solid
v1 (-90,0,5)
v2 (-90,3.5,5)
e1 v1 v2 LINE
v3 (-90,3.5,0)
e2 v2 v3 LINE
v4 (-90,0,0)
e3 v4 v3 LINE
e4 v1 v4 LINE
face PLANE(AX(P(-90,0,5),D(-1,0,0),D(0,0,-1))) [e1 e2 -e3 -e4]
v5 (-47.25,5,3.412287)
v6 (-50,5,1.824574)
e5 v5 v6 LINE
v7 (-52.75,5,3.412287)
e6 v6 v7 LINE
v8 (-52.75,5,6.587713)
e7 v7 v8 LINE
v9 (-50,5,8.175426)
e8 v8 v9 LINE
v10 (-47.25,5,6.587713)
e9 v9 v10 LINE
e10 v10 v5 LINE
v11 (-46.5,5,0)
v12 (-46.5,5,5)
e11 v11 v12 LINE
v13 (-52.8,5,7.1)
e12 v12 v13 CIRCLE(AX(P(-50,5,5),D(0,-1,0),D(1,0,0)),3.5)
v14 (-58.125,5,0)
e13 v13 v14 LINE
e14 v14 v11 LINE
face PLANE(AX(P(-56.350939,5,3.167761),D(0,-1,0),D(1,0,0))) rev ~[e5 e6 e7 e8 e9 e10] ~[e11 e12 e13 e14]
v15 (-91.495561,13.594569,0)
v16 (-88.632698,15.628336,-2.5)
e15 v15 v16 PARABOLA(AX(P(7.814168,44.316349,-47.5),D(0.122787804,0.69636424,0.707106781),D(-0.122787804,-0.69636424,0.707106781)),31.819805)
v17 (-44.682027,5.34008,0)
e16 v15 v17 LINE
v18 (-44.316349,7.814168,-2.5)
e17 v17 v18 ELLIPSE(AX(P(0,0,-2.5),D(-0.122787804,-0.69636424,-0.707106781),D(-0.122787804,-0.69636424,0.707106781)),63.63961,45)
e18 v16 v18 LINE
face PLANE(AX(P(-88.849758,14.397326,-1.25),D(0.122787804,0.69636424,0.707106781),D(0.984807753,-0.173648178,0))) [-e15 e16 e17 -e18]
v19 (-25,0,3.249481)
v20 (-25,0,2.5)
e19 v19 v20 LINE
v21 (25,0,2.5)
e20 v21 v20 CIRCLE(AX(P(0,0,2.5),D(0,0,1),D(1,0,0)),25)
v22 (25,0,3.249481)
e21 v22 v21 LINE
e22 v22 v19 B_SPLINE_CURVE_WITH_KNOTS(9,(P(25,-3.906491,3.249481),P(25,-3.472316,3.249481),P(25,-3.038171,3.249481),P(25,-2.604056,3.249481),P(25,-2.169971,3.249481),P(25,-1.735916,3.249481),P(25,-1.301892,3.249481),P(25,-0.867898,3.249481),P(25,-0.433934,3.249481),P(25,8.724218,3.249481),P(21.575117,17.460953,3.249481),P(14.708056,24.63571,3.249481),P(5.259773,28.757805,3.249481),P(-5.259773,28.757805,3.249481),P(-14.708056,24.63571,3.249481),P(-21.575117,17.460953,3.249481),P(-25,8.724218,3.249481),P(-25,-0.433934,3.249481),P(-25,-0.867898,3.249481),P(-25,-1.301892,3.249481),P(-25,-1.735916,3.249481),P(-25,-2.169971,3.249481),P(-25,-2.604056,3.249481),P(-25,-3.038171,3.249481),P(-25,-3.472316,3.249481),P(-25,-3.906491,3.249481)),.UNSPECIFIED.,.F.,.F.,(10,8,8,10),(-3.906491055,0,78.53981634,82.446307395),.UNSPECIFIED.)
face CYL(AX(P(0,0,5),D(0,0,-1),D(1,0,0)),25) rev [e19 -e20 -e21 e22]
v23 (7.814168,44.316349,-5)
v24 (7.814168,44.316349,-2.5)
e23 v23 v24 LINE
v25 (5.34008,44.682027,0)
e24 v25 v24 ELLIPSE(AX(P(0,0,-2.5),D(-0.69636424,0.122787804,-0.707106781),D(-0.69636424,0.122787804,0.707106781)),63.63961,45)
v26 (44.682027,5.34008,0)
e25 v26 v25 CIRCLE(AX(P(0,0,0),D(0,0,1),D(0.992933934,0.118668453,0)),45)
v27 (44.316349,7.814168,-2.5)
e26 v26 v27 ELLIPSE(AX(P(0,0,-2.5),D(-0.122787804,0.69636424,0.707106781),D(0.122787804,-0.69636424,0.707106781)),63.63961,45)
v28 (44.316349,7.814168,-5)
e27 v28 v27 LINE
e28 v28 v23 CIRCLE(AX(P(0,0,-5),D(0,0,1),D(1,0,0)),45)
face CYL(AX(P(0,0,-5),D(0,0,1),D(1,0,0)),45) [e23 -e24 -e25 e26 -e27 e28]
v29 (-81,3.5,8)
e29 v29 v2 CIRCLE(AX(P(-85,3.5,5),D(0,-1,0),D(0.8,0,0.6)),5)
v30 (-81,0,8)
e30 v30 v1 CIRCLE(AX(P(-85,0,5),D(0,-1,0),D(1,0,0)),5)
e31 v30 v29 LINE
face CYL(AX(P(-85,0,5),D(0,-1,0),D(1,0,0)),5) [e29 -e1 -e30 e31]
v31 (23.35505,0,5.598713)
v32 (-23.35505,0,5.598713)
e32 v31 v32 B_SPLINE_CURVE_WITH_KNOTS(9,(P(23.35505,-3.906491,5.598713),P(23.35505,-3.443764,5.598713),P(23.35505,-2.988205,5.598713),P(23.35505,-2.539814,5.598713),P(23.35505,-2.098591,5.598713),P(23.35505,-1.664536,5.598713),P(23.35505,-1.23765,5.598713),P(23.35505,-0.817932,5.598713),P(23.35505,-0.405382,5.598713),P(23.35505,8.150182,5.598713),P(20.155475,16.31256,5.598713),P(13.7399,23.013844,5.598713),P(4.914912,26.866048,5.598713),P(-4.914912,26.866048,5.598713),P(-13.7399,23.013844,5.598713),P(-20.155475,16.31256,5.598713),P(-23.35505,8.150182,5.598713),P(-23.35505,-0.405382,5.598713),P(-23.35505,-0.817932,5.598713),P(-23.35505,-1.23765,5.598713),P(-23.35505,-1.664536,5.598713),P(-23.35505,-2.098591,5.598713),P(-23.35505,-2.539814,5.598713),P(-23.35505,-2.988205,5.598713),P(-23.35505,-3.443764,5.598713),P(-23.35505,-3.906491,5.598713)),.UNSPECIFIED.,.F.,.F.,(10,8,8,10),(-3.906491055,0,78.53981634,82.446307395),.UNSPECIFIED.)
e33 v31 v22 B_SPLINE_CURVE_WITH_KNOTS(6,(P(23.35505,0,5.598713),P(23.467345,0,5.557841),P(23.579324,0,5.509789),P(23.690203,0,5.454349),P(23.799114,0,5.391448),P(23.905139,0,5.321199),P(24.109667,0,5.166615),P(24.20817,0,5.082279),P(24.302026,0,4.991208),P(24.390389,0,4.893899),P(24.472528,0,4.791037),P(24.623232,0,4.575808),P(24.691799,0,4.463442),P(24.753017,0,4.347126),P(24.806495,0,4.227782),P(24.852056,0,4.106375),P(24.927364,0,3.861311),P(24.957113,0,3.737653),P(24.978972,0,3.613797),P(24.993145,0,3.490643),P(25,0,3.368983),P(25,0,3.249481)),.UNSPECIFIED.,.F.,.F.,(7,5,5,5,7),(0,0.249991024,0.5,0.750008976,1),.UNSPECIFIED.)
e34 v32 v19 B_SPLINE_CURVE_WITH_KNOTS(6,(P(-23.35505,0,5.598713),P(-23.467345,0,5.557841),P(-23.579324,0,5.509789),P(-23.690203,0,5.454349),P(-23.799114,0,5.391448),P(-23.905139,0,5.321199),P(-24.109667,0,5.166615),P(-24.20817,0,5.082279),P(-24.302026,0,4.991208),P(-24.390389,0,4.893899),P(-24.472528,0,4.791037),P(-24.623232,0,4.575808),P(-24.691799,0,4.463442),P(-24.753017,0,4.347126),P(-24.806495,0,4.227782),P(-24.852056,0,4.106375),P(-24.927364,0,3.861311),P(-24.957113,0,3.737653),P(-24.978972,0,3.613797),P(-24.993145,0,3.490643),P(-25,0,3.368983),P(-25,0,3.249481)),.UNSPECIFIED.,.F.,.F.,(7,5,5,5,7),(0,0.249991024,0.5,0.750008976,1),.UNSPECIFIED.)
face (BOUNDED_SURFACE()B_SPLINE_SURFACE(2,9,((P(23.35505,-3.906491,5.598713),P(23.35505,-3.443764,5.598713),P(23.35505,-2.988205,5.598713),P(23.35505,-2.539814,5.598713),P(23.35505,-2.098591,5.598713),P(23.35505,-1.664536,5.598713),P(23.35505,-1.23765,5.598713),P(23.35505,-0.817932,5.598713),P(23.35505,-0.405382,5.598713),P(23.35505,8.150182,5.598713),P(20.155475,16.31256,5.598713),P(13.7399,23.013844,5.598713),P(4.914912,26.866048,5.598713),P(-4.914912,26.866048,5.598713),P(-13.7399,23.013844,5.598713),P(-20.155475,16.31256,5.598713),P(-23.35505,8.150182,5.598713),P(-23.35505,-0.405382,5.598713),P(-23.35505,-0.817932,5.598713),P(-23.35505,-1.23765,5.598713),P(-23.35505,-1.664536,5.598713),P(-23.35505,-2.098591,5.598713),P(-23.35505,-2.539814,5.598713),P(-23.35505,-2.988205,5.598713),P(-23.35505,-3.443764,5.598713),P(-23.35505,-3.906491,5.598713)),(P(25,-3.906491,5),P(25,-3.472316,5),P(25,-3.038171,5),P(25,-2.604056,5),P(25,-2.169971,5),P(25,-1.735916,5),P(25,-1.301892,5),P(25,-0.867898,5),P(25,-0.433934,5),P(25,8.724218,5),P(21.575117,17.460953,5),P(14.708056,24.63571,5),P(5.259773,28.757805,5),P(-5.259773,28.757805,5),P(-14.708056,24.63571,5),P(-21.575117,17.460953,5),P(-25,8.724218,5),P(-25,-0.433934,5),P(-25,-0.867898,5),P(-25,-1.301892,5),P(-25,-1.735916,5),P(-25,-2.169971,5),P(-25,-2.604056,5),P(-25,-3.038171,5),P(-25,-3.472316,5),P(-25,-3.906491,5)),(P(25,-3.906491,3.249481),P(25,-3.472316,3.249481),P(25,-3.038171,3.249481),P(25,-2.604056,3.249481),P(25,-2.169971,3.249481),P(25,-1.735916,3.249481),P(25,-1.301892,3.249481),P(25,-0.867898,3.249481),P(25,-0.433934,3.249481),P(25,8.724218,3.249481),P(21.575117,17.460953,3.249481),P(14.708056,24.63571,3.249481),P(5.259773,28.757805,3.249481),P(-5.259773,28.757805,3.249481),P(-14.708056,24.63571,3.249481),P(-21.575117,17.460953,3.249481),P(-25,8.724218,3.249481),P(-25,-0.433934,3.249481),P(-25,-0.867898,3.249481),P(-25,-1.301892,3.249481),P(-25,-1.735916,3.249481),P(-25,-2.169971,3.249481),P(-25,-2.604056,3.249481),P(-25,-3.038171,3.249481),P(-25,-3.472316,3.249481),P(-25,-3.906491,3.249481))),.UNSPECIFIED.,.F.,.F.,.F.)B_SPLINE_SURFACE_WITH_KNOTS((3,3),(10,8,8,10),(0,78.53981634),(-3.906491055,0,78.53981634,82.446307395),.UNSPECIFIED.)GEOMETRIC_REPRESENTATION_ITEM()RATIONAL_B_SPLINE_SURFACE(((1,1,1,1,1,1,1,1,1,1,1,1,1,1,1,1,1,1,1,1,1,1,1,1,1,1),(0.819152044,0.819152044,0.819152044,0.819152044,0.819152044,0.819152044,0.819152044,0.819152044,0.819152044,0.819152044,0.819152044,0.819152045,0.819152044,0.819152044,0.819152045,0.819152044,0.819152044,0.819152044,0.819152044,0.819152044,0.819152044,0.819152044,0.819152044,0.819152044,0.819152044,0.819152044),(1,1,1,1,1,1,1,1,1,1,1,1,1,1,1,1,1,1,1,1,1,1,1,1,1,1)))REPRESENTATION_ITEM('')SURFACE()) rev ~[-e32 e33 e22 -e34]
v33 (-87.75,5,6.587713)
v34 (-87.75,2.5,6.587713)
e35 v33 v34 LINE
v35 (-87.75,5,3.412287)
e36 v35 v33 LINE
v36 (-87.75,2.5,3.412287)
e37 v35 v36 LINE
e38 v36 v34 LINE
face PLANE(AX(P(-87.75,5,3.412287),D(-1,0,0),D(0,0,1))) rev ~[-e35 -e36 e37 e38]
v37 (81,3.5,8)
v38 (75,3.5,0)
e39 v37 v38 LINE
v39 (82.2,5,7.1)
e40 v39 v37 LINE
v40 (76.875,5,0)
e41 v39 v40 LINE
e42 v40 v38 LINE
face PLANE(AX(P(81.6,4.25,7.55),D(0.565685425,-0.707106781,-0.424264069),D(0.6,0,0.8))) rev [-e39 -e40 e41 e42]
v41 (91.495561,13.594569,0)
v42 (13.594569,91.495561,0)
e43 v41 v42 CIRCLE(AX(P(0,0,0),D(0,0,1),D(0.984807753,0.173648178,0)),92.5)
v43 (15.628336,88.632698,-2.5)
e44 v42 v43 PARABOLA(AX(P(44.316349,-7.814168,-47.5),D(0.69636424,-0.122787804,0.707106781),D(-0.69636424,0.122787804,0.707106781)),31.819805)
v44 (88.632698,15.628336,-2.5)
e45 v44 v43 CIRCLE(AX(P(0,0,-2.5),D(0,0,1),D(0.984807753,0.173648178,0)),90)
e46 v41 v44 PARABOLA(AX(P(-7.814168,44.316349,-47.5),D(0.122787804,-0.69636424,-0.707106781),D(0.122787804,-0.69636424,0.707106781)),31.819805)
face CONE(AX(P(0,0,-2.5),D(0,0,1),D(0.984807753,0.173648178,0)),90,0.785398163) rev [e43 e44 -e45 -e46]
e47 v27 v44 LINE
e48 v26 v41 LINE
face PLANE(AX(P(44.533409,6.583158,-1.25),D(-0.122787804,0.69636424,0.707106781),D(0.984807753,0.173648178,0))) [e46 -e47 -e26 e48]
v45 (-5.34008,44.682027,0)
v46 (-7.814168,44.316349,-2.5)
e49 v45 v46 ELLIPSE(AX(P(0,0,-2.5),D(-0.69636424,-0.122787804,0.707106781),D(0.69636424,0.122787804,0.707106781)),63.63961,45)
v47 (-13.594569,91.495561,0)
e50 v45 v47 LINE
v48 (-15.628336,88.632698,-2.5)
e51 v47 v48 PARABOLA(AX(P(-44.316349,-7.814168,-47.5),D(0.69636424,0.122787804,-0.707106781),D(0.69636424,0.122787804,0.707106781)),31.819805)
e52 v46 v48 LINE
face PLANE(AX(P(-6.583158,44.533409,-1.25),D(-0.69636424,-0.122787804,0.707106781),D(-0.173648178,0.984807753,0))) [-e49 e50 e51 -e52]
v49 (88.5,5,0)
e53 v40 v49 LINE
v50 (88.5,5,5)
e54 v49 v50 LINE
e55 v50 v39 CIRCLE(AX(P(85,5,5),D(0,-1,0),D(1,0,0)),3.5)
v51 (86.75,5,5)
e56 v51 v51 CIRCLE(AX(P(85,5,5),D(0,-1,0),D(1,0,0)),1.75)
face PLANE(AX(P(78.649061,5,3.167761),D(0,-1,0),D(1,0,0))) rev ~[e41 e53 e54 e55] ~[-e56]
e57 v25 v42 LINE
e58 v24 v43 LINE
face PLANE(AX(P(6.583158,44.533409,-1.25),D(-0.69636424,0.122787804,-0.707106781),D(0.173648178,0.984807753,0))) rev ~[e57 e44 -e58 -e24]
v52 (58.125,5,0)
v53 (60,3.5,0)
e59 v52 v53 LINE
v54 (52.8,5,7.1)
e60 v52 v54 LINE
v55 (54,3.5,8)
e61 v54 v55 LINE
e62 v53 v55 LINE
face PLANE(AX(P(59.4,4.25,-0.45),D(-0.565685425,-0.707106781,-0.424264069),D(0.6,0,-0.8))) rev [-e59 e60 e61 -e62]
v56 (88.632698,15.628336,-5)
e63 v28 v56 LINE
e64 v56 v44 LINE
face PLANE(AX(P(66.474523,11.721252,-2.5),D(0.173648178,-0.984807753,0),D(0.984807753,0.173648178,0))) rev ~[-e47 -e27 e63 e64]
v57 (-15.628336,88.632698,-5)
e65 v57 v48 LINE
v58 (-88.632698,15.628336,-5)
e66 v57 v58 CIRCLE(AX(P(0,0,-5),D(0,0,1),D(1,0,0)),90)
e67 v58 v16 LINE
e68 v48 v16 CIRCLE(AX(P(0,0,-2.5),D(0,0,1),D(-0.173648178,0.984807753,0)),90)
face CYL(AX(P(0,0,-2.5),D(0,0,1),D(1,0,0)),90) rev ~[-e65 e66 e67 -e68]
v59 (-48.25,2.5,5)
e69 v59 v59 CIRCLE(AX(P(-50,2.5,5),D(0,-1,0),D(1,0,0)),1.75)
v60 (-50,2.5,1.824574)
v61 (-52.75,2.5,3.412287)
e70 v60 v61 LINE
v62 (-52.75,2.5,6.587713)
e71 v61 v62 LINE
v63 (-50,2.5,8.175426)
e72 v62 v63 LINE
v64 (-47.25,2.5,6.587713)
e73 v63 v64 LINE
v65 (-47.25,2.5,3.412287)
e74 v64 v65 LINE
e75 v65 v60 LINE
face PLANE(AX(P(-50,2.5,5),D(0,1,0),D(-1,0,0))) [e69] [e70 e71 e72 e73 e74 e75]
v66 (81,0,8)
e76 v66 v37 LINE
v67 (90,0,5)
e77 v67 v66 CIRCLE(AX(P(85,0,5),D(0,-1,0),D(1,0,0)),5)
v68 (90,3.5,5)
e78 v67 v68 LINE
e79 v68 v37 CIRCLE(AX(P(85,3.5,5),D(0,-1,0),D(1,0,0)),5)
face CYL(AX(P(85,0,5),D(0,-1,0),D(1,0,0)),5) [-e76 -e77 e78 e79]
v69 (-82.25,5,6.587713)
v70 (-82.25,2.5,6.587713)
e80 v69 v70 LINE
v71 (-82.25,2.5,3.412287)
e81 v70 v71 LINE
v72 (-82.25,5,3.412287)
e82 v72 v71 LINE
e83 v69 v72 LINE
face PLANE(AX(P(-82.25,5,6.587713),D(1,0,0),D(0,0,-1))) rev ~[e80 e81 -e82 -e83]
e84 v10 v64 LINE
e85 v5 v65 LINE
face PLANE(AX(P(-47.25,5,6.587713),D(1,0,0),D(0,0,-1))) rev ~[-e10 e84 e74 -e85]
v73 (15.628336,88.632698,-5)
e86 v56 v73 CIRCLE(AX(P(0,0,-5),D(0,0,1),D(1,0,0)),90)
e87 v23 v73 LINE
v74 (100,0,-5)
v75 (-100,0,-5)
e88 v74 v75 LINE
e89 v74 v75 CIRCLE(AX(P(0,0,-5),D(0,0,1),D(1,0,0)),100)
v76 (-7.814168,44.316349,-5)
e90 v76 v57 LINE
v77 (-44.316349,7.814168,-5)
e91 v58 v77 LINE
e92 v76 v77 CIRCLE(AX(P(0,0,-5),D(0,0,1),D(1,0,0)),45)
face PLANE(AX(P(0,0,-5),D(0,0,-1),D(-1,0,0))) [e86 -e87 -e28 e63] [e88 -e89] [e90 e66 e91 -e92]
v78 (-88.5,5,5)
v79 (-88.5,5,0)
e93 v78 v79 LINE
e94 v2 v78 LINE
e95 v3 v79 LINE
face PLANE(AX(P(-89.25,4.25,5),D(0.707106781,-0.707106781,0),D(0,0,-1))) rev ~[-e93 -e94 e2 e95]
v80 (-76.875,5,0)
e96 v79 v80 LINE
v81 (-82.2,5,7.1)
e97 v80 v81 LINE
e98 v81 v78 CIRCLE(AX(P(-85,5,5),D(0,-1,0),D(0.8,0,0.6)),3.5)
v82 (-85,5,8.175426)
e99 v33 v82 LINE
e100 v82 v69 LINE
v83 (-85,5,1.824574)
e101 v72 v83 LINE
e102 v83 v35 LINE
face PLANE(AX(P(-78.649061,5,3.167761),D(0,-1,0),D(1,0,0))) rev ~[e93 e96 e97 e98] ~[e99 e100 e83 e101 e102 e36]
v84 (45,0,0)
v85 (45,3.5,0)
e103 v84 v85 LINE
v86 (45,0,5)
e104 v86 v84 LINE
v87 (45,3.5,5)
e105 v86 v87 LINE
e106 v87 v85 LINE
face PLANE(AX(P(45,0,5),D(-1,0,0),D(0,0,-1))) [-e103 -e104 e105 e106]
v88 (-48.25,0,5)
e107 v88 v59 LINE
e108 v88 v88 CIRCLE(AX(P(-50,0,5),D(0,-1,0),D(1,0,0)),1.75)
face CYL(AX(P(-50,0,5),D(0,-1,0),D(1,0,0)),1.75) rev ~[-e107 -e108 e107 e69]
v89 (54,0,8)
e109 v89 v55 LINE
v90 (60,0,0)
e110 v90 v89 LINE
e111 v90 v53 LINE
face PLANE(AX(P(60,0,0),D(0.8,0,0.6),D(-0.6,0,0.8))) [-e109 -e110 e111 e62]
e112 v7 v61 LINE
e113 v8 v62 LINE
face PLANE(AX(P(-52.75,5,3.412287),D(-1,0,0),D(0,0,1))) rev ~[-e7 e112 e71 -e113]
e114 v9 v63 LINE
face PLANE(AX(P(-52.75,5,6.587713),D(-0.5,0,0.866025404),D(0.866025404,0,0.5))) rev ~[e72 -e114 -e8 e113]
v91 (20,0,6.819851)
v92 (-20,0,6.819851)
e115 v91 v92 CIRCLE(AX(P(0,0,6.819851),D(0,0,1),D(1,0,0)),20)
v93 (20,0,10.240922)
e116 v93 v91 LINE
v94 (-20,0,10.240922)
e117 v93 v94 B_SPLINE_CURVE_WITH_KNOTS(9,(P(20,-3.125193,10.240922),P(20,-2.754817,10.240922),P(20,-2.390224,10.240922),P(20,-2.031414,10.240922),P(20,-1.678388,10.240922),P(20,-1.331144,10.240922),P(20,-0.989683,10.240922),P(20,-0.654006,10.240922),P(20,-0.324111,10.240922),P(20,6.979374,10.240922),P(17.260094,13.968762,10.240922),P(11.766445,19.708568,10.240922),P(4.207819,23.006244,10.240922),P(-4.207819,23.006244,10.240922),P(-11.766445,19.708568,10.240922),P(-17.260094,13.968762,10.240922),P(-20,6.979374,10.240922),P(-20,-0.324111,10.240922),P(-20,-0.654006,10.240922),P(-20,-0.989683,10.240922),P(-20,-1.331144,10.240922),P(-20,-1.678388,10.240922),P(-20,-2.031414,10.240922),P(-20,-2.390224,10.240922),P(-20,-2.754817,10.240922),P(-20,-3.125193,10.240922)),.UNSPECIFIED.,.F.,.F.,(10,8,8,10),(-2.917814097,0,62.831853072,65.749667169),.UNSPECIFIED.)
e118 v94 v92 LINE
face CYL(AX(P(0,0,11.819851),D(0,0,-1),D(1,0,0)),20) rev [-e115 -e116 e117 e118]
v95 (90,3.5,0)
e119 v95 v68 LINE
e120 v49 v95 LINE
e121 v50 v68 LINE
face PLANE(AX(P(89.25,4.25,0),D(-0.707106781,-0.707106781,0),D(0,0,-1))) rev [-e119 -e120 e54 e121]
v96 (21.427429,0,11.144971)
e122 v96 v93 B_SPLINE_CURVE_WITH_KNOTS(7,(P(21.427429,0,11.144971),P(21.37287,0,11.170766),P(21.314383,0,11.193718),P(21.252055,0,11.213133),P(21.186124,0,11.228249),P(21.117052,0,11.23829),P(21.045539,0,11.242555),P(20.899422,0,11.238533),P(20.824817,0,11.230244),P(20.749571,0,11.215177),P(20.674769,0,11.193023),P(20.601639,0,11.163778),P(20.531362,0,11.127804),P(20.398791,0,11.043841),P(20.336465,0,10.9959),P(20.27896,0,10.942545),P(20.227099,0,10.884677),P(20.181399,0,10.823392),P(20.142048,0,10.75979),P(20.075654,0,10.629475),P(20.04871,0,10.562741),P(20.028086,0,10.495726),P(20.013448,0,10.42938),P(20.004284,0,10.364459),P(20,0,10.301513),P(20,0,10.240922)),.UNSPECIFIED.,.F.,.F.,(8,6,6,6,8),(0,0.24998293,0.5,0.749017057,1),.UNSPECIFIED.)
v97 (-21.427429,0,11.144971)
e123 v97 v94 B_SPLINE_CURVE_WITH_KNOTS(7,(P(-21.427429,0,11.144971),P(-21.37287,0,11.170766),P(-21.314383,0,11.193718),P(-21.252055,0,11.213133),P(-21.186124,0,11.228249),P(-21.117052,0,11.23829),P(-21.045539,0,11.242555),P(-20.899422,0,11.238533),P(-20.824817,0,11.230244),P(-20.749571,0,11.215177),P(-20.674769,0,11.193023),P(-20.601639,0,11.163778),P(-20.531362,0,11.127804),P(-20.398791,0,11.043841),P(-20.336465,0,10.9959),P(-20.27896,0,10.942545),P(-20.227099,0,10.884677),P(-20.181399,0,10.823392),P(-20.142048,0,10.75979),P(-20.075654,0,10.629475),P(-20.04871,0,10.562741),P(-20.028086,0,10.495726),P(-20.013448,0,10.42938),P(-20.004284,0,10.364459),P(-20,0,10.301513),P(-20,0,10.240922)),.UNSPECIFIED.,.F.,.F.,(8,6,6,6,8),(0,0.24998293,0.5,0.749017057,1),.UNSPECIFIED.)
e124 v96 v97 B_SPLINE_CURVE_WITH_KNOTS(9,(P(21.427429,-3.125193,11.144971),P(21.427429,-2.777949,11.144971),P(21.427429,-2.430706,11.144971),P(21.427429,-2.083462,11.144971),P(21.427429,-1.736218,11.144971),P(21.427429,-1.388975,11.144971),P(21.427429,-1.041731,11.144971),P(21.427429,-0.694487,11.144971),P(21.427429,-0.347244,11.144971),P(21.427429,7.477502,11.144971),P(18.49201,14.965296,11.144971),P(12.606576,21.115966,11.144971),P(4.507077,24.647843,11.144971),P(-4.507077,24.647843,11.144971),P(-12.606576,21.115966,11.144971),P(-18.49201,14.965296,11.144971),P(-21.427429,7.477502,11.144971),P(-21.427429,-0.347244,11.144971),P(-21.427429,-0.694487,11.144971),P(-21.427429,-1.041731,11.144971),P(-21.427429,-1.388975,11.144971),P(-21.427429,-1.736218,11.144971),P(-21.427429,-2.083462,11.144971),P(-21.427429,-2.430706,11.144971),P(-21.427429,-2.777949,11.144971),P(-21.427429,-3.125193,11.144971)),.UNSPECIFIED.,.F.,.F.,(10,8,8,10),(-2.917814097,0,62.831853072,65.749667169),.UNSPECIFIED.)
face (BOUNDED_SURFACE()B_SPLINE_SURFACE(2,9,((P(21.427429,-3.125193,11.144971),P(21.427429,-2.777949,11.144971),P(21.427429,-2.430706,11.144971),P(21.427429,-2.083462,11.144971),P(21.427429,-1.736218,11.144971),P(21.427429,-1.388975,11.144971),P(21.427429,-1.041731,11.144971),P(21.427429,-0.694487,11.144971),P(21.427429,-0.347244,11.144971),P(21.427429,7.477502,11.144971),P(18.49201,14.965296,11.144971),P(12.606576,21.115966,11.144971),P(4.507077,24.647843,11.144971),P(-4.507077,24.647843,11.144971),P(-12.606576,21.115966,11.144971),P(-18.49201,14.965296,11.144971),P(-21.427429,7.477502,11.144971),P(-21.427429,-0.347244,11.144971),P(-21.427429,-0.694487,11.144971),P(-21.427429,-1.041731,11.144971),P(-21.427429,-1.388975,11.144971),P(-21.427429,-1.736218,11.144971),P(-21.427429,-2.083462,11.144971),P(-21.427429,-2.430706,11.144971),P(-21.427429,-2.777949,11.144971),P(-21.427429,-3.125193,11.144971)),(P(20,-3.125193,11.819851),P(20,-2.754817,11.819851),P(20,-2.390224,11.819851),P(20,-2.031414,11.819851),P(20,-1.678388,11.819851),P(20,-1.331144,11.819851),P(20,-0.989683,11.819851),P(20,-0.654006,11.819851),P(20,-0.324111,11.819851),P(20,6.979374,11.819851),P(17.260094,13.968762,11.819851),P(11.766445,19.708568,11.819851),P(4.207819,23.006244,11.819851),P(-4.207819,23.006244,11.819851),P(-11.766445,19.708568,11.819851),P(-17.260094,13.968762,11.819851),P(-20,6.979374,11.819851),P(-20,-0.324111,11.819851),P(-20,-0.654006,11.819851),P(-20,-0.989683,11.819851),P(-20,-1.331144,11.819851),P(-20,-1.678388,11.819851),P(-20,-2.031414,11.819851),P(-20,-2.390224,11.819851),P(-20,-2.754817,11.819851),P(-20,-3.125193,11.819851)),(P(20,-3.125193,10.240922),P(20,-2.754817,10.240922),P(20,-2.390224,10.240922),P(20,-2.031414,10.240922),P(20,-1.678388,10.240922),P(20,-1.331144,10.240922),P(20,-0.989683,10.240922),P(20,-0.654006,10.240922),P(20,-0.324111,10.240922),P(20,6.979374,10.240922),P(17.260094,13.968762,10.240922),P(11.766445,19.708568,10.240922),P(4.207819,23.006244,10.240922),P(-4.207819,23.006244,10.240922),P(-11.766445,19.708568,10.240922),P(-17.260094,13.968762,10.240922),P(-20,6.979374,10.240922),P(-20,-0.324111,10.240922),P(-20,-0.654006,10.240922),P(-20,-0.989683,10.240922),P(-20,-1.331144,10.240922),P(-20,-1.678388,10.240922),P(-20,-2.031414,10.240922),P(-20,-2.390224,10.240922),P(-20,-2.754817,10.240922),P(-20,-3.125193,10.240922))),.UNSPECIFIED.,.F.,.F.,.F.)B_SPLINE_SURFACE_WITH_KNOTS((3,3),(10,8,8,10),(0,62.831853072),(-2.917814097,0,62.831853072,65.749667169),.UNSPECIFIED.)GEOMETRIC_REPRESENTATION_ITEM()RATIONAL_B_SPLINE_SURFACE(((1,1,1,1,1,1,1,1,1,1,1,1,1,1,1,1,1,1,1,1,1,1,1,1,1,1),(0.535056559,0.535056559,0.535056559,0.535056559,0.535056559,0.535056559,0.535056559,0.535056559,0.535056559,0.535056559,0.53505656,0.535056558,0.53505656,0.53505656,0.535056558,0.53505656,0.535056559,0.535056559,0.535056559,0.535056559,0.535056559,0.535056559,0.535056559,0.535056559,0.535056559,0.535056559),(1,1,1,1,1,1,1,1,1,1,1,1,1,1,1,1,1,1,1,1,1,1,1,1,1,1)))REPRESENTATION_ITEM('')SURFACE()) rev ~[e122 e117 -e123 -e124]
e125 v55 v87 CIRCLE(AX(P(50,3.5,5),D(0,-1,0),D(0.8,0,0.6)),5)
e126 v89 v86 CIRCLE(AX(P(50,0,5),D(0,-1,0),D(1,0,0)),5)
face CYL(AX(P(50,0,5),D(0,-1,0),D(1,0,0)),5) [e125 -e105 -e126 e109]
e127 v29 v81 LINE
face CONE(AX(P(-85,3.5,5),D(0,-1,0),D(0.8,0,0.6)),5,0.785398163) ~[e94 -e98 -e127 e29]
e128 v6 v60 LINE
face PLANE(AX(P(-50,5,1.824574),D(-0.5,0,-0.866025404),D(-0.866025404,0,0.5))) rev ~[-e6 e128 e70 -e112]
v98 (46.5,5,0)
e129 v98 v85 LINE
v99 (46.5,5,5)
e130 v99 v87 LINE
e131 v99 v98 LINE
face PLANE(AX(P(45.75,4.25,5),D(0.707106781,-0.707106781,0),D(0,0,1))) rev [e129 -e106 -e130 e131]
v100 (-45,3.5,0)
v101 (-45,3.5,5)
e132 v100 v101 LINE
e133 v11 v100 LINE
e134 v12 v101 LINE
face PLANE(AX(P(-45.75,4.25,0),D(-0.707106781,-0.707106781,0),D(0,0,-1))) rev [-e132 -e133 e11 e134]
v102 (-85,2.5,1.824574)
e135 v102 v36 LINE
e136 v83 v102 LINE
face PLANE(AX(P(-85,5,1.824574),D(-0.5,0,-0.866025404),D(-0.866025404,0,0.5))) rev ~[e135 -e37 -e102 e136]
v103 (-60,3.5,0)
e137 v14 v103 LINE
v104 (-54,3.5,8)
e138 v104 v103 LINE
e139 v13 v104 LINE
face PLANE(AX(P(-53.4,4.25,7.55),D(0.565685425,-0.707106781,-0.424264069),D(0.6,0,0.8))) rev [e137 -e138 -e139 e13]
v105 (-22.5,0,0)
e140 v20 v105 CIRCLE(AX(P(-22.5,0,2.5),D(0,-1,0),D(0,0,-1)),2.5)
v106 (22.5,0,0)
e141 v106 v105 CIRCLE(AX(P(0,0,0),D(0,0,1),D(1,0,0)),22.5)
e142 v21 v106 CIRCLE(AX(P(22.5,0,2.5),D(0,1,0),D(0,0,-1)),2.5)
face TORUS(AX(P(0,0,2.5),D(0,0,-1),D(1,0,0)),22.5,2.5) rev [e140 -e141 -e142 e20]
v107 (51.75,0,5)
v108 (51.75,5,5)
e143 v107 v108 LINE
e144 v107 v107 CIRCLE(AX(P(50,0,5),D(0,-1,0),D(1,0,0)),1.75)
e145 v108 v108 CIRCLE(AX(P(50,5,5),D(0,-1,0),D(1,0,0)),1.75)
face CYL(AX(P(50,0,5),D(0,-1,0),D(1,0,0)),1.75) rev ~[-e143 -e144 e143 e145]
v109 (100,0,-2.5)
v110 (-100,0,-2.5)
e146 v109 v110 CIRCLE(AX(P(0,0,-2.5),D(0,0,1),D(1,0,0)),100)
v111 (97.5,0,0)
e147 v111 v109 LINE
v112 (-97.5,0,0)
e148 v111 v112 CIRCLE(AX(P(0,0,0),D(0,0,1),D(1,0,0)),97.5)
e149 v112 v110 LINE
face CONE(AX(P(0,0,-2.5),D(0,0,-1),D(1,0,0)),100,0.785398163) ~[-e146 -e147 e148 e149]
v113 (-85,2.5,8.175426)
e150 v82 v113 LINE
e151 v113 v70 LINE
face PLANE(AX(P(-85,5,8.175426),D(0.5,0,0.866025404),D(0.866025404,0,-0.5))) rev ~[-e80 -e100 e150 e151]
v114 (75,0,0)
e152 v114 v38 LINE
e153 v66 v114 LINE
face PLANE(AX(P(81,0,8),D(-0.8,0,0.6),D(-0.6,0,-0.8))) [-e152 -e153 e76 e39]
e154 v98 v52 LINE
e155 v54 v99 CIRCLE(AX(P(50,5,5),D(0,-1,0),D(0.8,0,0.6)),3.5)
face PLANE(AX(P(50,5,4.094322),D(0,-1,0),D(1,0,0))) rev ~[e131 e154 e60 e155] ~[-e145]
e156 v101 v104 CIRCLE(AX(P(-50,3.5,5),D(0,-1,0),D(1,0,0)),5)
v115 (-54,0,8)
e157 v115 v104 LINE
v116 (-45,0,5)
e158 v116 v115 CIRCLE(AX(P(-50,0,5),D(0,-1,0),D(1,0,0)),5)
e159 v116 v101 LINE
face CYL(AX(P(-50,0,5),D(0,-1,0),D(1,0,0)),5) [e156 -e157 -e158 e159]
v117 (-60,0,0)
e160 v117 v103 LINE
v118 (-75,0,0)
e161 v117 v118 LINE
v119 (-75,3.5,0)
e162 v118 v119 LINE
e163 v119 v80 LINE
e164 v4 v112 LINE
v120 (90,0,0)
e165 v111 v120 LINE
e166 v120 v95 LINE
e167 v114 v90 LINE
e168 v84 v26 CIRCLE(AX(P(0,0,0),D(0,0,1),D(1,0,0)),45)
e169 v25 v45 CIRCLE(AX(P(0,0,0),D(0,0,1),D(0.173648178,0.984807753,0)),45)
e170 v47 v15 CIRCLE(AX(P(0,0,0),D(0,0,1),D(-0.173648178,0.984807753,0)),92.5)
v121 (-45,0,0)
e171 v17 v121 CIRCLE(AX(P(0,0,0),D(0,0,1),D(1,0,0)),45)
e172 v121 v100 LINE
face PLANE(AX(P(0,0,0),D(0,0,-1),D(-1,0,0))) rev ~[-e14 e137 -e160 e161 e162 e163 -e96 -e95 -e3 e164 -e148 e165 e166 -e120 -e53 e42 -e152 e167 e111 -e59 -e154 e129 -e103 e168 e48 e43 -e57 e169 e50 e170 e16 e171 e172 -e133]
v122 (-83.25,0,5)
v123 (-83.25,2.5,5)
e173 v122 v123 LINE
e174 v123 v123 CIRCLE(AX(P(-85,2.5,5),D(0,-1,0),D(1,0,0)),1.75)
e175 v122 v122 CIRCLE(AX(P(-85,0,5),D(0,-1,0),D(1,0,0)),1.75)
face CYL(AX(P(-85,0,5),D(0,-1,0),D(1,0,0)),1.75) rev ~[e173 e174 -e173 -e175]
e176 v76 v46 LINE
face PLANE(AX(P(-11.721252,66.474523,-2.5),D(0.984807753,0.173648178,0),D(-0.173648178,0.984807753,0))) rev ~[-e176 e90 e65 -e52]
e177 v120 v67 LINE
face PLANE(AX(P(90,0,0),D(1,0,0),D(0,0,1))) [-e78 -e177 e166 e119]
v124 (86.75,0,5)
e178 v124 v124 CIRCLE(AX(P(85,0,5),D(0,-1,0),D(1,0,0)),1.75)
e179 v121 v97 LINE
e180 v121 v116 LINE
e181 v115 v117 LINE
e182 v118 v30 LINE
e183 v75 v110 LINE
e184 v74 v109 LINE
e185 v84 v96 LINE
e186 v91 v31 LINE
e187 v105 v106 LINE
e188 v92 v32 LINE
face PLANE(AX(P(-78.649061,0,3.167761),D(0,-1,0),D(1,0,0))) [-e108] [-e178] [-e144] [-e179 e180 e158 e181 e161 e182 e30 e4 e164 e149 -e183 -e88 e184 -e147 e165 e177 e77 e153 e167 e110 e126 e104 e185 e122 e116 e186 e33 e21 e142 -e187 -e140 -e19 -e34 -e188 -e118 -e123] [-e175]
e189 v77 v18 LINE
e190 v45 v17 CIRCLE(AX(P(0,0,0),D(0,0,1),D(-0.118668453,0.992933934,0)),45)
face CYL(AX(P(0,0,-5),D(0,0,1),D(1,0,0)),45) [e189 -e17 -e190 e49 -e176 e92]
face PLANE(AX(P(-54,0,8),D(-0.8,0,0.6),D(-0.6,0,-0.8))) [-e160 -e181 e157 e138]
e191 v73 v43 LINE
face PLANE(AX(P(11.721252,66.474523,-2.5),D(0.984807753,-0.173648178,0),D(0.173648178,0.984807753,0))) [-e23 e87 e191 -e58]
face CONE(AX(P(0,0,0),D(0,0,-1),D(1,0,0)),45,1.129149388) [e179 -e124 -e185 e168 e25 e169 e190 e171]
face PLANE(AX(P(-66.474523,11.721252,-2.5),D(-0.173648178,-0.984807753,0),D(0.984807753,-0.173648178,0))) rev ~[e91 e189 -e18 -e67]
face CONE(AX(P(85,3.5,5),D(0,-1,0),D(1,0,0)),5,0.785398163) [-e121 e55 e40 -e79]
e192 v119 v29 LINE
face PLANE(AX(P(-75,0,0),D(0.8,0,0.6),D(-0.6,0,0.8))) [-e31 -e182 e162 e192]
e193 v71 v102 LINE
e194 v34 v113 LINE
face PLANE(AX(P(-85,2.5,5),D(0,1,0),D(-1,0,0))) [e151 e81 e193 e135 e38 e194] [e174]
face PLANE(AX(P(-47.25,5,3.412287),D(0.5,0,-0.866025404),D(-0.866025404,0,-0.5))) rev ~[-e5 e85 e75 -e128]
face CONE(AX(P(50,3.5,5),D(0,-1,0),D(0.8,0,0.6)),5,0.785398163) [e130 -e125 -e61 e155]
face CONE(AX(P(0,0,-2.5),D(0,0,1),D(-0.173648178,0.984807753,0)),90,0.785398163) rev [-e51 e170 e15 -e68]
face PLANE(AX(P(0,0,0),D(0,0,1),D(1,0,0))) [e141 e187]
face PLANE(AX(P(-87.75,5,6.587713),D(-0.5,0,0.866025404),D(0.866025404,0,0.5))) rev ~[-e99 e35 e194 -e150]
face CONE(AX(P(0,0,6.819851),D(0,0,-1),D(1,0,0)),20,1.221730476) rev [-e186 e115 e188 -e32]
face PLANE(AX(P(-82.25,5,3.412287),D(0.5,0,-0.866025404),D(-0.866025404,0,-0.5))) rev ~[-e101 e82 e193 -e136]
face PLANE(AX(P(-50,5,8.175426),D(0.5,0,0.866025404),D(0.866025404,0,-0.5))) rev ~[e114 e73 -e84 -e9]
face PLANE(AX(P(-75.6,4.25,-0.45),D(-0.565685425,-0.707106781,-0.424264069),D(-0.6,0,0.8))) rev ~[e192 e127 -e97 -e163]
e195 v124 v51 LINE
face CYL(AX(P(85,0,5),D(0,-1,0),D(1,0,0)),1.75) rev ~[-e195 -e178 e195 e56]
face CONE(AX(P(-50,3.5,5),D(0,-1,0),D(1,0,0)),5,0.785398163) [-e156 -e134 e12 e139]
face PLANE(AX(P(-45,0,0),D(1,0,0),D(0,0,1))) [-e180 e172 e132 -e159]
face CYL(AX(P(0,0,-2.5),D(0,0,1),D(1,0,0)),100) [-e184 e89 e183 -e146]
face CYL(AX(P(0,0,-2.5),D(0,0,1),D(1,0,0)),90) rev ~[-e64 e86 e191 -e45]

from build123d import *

# Parameters (mm, degrees)
F1_ANGLE      = 180
F0_W          = 10
F0_H          = 5
F2_R          = 1
F3_R          = 2.5
F4_W          = 45
F4_H          = 5
F5_ANGLE      = 10
F6_W          = 45
F6_H          = 5
F7_ANGLE      = 10
F8_W          = 45
F8_H          = 5
F9_ANGLE_BACK = 10
F9_ANGLE      = 20
F10_R         = 1.75
F11_DEPTH     = 5
F13_DEPTH     = 2.5
F14_SIZE      = 2.5
F16_DEPTH     = 5
F17_SIZE      = 1.5


with BuildPart() as f1:
    # F0 (on Front) → F1 (revolve)
    with BuildSketch(Plane.XZ):
        Polygon((25, 0), (0, 0), (0, -5), (45, -5), (45, 0), (20, 11.8198511713), (20, 6.8198511713), (25, 5), align=None)
    revolve(axis=Axis((0, 0, -2.5), (0, 0, 1)), revolution_arc=F1_ANGLE)

    # F2
    f2_edges = [f1.edges().sort_by_distance(p)[0] for p in [
        (0, 20, 11.819851),
    ]]
    fillet(f2_edges, radius=F2_R)

    # F3
    f3_edges = [f1.edges().sort_by_distance(p)[0] for p in [
        (0, 25, 5),
        (0, 25, 0),
    ]]
    fillet(f3_edges, radius=F3_R)



with BuildPart() as f1b:
    # F0 (on Front) → F1, piece 2 (revolve)
    with BuildSketch(Plane.XZ):
        with Locations((95, -2.5)):
            Rectangle(F0_W, F0_H)
    revolve(axis=Axis((0, 0, -2.5), (0, 0, 1)), revolution_arc=F1_ANGLE)


with BuildPart() as f1_1:
    add(f1.part)

    add(f1b.part)  # F5 merges F1b
    # F4 (on face) → F5 (revolve)
    with BuildSketch(Plane.XZ):
        with Locations((67.5, -2.5)):
            Rectangle(F4_W, F4_H)
    revolve(axis=Axis((0, 0, 10), (0, 0, 1)), revolution_arc=F5_ANGLE)

    # F6 (on face) → F7 (revolve)
    with BuildSketch(Plane.XZ):
        with Locations((-67.5, -2.5)):
            Rectangle(F6_W, F6_H)
    revolve(axis=Axis((0, 0, 10), (0, 0, -1)), revolution_arc=F7_ANGLE)

    # F8 (on Right) → F9 (revolve)
    with BuildSketch(Plane.YZ, mode=Mode.PRIVATE) as f9_sk:
        with Locations((67.5, -2.5)):
            Rectangle(F8_W, F8_H)
    revolve(f9_sk.sketch.rotate(Axis((0, 0, 10), (0, 0, 1)), -F9_ANGLE_BACK), axis=Axis((0, 0, 10), (0, 0, 1)), revolution_arc=F9_ANGLE)

    # F10 (on face) → F11 (join)
    with BuildSketch(Plane.XZ):
        with BuildLine():
            Line((-90, 5), (-90, 0))
            Line((-90, 0), (-80, 0))
            Line((-80, 0), (-80, 5))
            ThreePointArc((-80, 5), (-85, 10), (-90, 5))
        make_face()
        with Locations((-85, 5)):
            Circle(F10_R, mode=Mode.SUBTRACT)
        with BuildLine():
            Line((-55, 0), (-45, 0))
            Line((-45, 0), (-45, 5))
            ThreePointArc((-45, 5), (-50, 10), (-55, 5))
            Line((-55, 5), (-55, 0))
        make_face()
        with Locations((-50, 5)):
            Circle(F10_R, mode=Mode.SUBTRACT)
        with BuildLine():
            Line((80, 5), (80, 0))
            Line((80, 0), (90, 0))
            Line((90, 0), (90, 5))
            ThreePointArc((90, 5), (85, 10), (80, 5))
        make_face()
        with Locations((85, 5)):
            Circle(F10_R, mode=Mode.SUBTRACT)
        with BuildLine():
            Line((45, 0), (55, 0))
            Line((55, 0), (55, 5))
            ThreePointArc((55, 5), (50, 10), (45, 5))
            Line((45, 5), (45, 0))
        make_face()
        with Locations((50, 5)):
            Circle(F10_R, mode=Mode.SUBTRACT)
    extrude(amount=-F11_DEPTH)

    # F12 (on face) → F13 (cut)
    with BuildSketch(Plane(origin=(0, 5, 0), x_dir=(-1, 0, 0), z_dir=(0, 1, 0))):
        Polygon((52.75, 3.4122867597), (52.75, 6.5877132403), (50, 8.1754264805), (47.25, 6.5877132403), (47.25, 3.4122867597), (50, 1.8245735195), align=None)
        Polygon((82.25, 6.5877132403), (82.25, 3.4122867597), (85, 1.8245735195), (87.75, 3.4122867597), (87.75, 6.5877132403), (85, 8.1754264805), align=None)
    extrude(amount=-F13_DEPTH, mode=Mode.SUBTRACT)

    # F14
    f14_edges = [f1_1.edges().sort_by_distance(p)[0] for p in [
        (-11.721252, 66.474523, 0),
        (11.721252, 66.474523, 0),
        (-63.63961, 63.63961, 0),
        (-66.474523, 11.721252, 0),
        (66.474523, 11.721252, 0),
        (63.63961, 63.63961, 0),
        (0, 100, 0),
    ]]
    chamfer(f14_edges, length=F14_SIZE)

    # F15 (on face) → F16 (join, through all)
    with BuildSketch(Plane.XZ):
        with BuildLine():
            Line((-80, 0), (-75, 0))
            Line((-75, 0), (-81, 8))
            ThreePointArc((-81, 8), (-80.2565835097, 6.5811388301), (-80, 5))
            Line((-80, 5), (-80, 0))
        make_face()
        with BuildLine():
            Line((-60, 0), (-55, 0))
            Line((-55, 0), (-55, 5))
            ThreePointArc((-55, 5), (-54.7434164903, 6.5811388301), (-54, 8))
            Line((-54, 8), (-60, 0))
        make_face()
        with BuildLine():
            ThreePointArc((54, 8), (54.7434164903, 6.5811388301), (55, 5))
            Line((55, 5), (55, 0))
            Line((55, 0), (60, 0))
            Line((60, 0), (54, 8))
        make_face()
        with BuildLine():
            Line((80, 0), (80, 5))
            ThreePointArc((80, 5), (80.2565835097, 6.5811388301), (81, 8))
            Line((81, 8), (75, 0))
            Line((75, 0), (80, 0))
        make_face()
    extrude(amount=-F16_DEPTH)

    # F17
    f17_edges = [f1_1.edges().sort_by_distance(p)[0] for p in [
        (-57, 5, 4),
        (-78, 5, 4),
        (78, 5, 4),
        (57, 5, 4),
        (90, 5, 2.5),
        (86.581139, 5, 9.743416),
        (48.418861, 5, 9.743416),
        (45, 5, 2.5),
        (-45, 5, 2.5),
        (-48.418861, 5, 9.743416),
        (-86.581139, 5, 9.743416),
        (-90, 5, 2.5),
    ]]
    chamfer(f17_edges, length=F17_SIZE)


solid = f1_1.part
